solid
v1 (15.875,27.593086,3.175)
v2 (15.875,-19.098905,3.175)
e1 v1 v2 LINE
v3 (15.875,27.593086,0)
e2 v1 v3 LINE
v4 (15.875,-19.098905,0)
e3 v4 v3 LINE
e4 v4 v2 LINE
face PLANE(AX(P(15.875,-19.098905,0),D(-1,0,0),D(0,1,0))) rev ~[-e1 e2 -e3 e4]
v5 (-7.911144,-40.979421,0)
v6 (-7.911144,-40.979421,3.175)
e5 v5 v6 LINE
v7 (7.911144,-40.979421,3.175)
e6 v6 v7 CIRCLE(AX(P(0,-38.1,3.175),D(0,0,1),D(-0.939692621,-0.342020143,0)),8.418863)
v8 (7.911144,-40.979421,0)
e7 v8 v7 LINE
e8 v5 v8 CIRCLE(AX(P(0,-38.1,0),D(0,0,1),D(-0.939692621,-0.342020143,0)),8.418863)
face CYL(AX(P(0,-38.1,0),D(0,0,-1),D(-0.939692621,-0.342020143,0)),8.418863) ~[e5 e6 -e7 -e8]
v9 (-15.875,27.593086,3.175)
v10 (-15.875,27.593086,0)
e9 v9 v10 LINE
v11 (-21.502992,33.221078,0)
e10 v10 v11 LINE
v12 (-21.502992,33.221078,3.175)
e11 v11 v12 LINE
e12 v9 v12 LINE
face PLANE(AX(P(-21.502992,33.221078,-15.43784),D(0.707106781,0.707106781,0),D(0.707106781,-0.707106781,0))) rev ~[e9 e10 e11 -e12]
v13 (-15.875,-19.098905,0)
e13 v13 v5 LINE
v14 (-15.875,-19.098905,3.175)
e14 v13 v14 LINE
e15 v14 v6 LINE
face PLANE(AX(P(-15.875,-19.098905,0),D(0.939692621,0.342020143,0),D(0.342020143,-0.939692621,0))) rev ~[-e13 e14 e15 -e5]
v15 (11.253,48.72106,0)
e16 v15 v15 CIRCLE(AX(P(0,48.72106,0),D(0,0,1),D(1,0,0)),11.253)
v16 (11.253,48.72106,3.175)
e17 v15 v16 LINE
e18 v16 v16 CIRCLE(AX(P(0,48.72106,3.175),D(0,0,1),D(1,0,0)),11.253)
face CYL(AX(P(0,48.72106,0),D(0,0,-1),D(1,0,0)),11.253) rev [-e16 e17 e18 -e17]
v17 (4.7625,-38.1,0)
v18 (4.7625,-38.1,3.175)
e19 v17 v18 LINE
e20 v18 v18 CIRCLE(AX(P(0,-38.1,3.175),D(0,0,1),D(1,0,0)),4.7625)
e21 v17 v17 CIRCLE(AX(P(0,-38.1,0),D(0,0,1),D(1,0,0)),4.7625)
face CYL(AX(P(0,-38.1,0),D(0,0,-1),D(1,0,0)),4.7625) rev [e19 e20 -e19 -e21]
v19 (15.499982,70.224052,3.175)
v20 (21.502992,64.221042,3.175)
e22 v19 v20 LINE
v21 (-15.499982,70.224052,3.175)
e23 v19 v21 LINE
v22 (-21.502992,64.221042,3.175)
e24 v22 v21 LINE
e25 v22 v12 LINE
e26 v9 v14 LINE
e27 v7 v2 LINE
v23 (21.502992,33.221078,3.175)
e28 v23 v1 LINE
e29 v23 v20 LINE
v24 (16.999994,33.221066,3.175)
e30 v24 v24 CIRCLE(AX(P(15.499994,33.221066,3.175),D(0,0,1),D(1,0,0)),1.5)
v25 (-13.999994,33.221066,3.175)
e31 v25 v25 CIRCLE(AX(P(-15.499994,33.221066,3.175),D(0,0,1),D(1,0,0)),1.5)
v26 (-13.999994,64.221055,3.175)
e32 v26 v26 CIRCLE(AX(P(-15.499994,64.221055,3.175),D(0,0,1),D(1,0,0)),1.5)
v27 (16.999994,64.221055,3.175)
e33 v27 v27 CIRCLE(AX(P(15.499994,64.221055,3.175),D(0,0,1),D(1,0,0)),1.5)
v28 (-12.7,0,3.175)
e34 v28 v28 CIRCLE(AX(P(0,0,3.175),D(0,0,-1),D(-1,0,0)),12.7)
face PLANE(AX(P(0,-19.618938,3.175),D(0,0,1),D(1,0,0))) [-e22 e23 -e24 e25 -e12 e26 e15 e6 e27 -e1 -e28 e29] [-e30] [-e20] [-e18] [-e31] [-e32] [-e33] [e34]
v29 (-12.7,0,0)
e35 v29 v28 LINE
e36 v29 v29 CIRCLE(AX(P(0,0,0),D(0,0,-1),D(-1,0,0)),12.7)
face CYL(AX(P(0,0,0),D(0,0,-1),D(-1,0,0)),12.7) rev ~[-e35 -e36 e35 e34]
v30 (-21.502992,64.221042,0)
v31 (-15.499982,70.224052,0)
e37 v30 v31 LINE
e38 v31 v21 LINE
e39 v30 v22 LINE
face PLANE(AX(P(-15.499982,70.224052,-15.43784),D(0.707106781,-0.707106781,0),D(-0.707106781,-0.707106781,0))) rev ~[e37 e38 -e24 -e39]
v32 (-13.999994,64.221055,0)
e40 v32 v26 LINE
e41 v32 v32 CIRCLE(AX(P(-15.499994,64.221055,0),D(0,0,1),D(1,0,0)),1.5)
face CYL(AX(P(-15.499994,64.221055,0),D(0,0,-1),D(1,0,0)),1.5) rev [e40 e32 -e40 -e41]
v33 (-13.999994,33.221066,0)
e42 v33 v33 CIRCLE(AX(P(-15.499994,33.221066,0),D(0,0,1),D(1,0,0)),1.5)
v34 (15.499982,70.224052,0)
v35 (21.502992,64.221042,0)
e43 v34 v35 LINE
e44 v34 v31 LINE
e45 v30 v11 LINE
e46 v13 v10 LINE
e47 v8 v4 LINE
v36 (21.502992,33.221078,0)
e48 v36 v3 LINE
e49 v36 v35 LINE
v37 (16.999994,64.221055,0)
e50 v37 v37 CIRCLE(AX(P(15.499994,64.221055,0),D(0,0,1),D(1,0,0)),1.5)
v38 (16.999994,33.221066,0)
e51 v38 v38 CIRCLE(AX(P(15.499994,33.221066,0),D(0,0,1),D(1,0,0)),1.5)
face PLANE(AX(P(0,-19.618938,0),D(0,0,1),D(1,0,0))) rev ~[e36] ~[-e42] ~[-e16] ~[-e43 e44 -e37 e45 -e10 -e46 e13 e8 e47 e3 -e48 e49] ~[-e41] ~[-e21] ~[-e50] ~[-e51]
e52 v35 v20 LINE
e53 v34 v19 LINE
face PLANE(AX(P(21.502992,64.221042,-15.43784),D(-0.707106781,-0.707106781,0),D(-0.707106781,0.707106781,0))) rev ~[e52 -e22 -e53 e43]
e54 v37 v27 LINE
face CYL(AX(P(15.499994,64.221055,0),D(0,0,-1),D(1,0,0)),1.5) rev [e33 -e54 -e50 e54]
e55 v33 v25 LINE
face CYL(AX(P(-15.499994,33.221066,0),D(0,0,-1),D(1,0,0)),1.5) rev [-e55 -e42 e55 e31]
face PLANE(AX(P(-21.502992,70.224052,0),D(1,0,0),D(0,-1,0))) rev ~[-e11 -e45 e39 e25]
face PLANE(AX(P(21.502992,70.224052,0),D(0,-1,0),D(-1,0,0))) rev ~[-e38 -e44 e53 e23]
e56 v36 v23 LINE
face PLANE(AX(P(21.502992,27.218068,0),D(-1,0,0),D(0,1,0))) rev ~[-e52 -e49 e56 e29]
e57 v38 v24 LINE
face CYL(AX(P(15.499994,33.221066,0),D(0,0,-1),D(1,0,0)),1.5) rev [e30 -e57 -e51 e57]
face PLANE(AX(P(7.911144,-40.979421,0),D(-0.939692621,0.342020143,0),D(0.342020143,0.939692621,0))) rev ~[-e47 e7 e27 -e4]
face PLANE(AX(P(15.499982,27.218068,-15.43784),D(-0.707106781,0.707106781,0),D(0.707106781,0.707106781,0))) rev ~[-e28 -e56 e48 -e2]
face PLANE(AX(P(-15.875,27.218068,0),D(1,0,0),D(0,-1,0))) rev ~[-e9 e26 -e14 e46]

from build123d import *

# Parameters (mm, degrees)
F0_R         = 4.7625
F0_R_2       = 1.5
F0_R_3       = 11.2530001
F1_DEPTH     = 3.175
F2_T1_DEPTH  = 34.0506804732
F2_T6_DEPTH  = 34.0506804732
F2_T11_DEPTH = 34.0506804732


# Not quite as in the source:
# - a fillet or chamfer that OpenCascade refuses, or shapes differently, is made with other operations: its cross-section is extruded or revolved along the edge and cut away or added


with BuildPart() as f1:
    # F0 (on Top) → F1 (new body)
    with BuildSketch(Plane.XY):
        with BuildLine():
            Line((15.875, 0), (12.7, 0))
            ThreePointArc((12.7, 0), (0, -12.7), (-12.7, 0))
            Line((-12.7, 0), (-15.875, 0))
            Line((-15.875, 0), (-15.875, -19.0989050379))
            Line((-15.875, -19.0989050379), (-7.9111435612, -40.9794207753))
            ThreePointArc((-7.9111435612, -40.9794207753), (0, -46.5188631327), (7.9111435612, -40.9794207753))
            Line((7.9111435612, -40.9794207753), (15.875, -19.0989050379))
            Line((15.875, -19.0989050379), (15.875, 0))
        make_face()
        with Locations((0, -38.1)):
            Circle(F0_R, mode=Mode.SUBTRACT)
        with BuildLine():
            ThreePointArc((-12.7, 0), (0, 12.7), (12.7, 0))
            Line((12.7, 0), (15.875, 0))
            Line((15.875, 0), (15.875, 27.2180678568))
            Line((15.875, 27.2180678568), (21.5029923, 27.2180678568))
            Line((21.5029923, 27.2180678568), (21.5029923, 70.2240524568))
            Line((21.5029923, 70.2240524568), (-21.5029923, 70.2240524568))
            Line((-21.5029923, 70.2240524568), (-21.5029923, 27.2180678568))
            Line((-21.5029923, 27.2180678568), (-15.875, 27.2180678568))
            Line((-15.875, 27.2180678568), (-15.875, 0))
            Line((-15.875, 0), (-12.7, 0))
        make_face()
        with Locations((-15.4999944, 33.2210657568)):
            Circle(F0_R_2, mode=Mode.SUBTRACT)
        with Locations((-15.4999944, 64.2210545568)):
            Circle(F0_R_2, mode=Mode.SUBTRACT)
        with Locations((15.4999944, 33.2210657568)):
            Circle(F0_R_2, mode=Mode.SUBTRACT)
        with Locations((0, 48.7210601568)):
            Circle(F0_R_3, mode=Mode.SUBTRACT)
        with Locations((15.4999944, 64.2210545568)):
            Circle(F0_R_2, mode=Mode.SUBTRACT)
    extrude(amount=F1_DEPTH)

    # F2: chamfer of 6.0030106 on 4 edges, made by hand

    # F2_s2 → F2_t1 (cut)
    with BuildSketch(Plane.XY.offset(-15.4378402366)):
        Polygon((21.5029923, 64.2210418568), (15.4999817, 70.2240524568), (21.5029923, 70.2240524568), align=None)
        Polygon((-15.4999817, 70.2240524568), (-21.5029923, 64.2210418568), (-21.5029923, 70.2240524568), align=None)
    extrude(amount=F2_T1_DEPTH, mode=Mode.SUBTRACT)


with BuildPart() as f2_tool4:
    # F2_s5 → F2_t6 (new body)
    with BuildSketch(Plane.XY.offset(-15.4378402366)):
        Polygon((15.4999817, 27.2180678568), (21.5029923, 33.2210784568), (21.5029923, 27.2180678568), align=None)
    extrude(amount=F2_T6_DEPTH)

    split(bisect_by=Plane.YZ.offset(15.875), keep=Keep.TOP)


with BuildPart() as f1_1:
    add(f1.part)

    # F2_t3: cut F2_tool4
    add(f2_tool4.part, mode=Mode.SUBTRACT)


with BuildPart() as f2_tool9:
    # F2_s10 → F2_t11 (new body)
    with BuildSketch(Plane.XY.offset(-15.4378402366)):
        Polygon((-21.5029923, 33.2210784568), (-15.4999817, 27.2180678568), (-21.5029923, 27.2180678568), align=None)
    extrude(amount=F2_T11_DEPTH)

    split(bisect_by=Plane.YZ.offset(-15.875), keep=Keep.BOTTOM)


with BuildPart() as f1_2:
    add(f1_1.part)

    # F2_t8: cut F2_tool9
    add(f2_tool9.part, mode=Mode.SUBTRACT)


solid = f1_2.part
